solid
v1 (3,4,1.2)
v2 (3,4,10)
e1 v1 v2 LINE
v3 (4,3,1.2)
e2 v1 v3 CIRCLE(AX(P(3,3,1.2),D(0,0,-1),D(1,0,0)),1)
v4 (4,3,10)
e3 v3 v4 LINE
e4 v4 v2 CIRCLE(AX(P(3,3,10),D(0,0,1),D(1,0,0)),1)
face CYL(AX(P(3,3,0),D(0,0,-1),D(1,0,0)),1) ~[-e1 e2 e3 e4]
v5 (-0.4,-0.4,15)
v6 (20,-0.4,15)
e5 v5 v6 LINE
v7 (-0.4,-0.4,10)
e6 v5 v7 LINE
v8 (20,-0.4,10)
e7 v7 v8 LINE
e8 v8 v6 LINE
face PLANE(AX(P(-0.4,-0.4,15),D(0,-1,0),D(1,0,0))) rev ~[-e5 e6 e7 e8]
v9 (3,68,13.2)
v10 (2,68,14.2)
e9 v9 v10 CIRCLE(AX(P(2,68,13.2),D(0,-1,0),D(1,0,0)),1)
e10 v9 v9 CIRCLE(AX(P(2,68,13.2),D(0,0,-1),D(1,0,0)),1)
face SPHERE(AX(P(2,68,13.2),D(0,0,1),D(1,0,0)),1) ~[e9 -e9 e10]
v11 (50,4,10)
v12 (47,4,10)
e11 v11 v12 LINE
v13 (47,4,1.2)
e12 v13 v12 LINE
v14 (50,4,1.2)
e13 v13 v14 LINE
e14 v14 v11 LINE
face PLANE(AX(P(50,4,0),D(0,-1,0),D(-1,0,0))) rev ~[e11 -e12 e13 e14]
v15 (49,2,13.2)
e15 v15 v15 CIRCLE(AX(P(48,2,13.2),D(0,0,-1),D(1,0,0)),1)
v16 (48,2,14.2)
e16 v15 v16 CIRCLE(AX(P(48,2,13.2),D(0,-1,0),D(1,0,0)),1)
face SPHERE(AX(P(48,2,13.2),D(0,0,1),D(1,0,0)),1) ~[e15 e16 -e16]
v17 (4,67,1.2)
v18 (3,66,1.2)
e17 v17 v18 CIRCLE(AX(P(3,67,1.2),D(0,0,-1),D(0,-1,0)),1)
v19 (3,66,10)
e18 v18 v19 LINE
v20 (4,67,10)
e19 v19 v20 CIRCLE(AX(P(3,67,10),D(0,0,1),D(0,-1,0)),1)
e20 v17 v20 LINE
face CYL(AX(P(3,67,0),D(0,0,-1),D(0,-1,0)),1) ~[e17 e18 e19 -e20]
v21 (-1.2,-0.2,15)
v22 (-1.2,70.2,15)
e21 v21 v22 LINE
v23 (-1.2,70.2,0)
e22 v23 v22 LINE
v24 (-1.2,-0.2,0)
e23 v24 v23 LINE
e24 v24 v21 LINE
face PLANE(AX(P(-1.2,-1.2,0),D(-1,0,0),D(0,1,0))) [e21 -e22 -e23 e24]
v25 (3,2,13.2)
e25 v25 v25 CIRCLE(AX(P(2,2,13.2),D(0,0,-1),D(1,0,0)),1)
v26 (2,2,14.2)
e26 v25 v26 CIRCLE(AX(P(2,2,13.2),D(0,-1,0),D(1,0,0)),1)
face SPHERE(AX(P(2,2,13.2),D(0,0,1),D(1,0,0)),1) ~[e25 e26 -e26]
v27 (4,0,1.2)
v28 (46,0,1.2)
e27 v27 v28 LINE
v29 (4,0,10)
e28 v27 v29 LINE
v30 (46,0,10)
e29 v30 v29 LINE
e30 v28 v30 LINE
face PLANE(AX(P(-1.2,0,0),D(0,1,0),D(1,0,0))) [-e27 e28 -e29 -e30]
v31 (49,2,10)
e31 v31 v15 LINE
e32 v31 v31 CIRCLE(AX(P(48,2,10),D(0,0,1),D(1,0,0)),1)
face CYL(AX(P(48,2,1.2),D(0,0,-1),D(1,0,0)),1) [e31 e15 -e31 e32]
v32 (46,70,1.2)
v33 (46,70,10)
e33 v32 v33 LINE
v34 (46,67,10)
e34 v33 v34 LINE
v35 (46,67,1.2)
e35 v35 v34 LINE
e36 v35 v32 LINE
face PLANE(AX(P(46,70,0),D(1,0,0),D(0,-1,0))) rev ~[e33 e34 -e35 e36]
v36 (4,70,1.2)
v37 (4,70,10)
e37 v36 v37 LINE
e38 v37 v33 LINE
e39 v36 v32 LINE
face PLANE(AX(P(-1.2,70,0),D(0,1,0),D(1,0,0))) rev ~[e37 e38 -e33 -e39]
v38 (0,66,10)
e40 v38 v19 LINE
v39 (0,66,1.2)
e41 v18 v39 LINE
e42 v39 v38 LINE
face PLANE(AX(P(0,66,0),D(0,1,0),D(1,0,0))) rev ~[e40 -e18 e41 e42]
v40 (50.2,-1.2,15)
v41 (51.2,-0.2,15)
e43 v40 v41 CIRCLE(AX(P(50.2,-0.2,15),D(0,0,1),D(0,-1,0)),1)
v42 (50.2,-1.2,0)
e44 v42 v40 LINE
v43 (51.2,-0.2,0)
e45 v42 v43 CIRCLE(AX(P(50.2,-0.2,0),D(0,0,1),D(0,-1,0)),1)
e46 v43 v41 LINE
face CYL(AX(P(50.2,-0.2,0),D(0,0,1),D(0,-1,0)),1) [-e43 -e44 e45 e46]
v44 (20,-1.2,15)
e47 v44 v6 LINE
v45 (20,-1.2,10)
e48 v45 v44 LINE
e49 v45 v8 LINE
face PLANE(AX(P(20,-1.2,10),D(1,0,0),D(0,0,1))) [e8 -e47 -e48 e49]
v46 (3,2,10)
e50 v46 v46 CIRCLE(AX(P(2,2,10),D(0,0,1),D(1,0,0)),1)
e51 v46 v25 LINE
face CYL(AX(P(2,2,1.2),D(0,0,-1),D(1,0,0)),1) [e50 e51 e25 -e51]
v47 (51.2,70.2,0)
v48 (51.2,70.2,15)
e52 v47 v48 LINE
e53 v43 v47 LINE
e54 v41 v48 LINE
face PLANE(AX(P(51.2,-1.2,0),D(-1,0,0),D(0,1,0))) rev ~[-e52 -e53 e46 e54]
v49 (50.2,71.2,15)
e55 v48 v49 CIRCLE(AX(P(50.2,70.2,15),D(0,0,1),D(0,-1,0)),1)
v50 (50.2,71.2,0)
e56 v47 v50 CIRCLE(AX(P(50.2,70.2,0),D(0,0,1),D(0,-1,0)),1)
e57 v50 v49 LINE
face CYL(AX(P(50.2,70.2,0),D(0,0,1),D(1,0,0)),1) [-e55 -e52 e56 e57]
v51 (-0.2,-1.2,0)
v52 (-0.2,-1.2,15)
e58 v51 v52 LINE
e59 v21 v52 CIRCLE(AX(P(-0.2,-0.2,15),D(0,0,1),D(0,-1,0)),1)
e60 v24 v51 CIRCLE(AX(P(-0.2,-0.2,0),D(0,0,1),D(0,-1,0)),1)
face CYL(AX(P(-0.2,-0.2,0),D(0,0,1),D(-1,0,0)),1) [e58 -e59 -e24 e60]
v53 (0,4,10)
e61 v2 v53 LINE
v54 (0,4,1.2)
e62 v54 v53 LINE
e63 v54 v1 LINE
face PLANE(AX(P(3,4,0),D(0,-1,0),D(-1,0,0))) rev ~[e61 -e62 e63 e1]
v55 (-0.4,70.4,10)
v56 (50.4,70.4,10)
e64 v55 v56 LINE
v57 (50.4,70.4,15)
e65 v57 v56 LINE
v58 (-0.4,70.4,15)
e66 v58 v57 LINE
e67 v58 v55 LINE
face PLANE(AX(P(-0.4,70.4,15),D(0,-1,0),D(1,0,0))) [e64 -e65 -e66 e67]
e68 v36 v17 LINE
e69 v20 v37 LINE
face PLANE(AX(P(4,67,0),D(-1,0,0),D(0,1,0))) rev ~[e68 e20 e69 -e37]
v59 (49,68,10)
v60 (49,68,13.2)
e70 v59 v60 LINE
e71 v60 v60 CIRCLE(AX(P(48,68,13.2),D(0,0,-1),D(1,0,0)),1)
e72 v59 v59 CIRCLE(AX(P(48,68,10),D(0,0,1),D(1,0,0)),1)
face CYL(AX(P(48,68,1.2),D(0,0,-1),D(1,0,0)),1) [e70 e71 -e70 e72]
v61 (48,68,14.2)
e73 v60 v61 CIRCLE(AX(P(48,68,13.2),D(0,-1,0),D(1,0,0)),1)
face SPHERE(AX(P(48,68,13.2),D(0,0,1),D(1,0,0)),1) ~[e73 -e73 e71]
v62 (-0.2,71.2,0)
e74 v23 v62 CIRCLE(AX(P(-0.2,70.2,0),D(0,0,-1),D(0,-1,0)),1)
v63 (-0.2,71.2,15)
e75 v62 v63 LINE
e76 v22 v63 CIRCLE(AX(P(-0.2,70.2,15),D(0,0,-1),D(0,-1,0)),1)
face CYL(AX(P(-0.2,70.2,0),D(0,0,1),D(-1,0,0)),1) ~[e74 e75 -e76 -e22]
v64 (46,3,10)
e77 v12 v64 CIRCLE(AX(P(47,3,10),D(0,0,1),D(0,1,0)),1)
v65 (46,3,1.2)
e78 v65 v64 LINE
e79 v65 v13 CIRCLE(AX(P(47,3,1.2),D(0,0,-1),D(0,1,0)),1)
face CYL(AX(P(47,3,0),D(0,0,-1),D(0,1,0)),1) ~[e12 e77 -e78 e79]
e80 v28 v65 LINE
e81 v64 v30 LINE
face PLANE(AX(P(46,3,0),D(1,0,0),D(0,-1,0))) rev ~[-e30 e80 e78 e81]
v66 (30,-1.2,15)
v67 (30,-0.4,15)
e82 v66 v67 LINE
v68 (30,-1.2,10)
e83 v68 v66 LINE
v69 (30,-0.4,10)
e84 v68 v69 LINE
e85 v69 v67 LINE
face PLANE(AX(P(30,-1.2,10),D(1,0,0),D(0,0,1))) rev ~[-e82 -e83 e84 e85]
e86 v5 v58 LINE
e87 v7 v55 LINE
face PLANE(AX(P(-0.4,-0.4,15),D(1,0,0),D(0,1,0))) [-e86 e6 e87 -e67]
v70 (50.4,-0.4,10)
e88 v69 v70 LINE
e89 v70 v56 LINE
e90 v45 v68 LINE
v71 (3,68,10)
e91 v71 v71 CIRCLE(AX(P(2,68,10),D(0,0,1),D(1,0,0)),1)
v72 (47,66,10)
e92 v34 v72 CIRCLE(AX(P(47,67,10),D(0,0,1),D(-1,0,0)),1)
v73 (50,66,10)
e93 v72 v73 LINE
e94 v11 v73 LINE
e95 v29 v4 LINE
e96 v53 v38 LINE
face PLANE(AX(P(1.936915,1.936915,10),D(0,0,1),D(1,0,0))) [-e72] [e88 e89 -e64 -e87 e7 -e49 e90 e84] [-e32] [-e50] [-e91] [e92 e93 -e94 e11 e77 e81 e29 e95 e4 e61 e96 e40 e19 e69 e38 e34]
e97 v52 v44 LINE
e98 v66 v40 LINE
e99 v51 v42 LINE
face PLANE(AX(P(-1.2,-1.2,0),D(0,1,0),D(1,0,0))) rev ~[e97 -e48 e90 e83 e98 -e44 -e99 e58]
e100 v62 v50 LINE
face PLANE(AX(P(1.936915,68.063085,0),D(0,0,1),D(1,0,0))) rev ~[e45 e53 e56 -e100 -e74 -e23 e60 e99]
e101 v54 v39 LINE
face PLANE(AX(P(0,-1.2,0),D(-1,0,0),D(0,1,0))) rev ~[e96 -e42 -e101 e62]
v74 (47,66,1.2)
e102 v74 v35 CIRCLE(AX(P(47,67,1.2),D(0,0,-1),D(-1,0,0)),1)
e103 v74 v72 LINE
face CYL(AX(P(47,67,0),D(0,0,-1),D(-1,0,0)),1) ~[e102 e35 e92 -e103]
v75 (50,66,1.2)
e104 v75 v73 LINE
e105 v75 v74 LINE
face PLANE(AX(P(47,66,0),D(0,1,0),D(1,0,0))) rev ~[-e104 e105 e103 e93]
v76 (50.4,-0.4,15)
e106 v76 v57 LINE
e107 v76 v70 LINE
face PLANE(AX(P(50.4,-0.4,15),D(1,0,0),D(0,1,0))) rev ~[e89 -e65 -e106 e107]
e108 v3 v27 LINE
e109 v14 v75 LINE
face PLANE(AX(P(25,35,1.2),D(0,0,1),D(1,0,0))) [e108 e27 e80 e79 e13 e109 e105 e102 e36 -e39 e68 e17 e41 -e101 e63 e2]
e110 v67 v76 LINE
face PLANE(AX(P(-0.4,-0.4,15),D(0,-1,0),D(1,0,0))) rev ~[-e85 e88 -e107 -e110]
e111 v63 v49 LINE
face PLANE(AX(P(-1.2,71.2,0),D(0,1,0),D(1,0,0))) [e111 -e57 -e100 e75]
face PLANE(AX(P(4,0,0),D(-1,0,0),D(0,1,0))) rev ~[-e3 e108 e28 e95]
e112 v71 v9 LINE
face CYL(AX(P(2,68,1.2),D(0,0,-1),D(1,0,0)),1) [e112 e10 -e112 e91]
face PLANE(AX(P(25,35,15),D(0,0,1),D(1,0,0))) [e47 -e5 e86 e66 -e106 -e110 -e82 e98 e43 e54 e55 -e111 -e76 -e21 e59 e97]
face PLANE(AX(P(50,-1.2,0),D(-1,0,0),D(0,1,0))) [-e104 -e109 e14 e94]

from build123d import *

# Parameters (mm, degrees)
F1_W      = 52.4
F1_H      = 72.4
F2_DEPTH  = 15
F3_T      = -1.2
F0_R      = 1
F4_DEPTH  = 10
F5_DEPTH  = 13
F6_R      = 1
F8_W      = 50.8
F8_H      = 70.8
F8_W_2    = 50
F8_H_2    = 70
F9_DEPTH  = 5
F10_W     = 10
F10_H     = 10
F11_DEPTH = 25


# Not quite as in the source:
# - two fillets or chamfers of one size are made in one step


with BuildPart() as f2:
    # F1 (on Top) → F2 (new body)
    with BuildSketch(Plane.XY):
        with Locations((25, 35)):
            Rectangle(F1_W, F1_H)
    extrude(amount=F2_DEPTH)

    # F3
    f3_openings = [f2.faces().sort_by_distance(p)[0] for p in [
        (25, 35, 15),
    ]]
    offset(amount=F3_T, openings=f3_openings)

    # F0 (on Top) → F4 (join)
    with BuildSketch(Plane.XY):
        with BuildLine():
            Line((4, 70), (0, 70))
            Line((0, 70), (0, 66))
            Line((0, 66), (3, 66))
            ThreePointArc((3, 66), (3.7071067812, 66.2928932188), (4, 67))
            Line((4, 67), (4, 70))
        make_face()
        with Locations((2, 68)):
            Circle(F0_R, mode=Mode.SUBTRACT)
        with BuildLine():
            Line((47, 66), (50, 66))
            Line((50, 66), (50, 70))
            Line((50, 70), (46, 70))
            Line((46, 70), (46, 67))
            ThreePointArc((46, 67), (46.2928932188, 66.2928932188), (47, 66))
        make_face()
        with Locations((48, 68)):
            Circle(F0_R, mode=Mode.SUBTRACT)
        with BuildLine():
            Line((50, 0), (50, 4))
            Line((50, 4), (47, 4))
            ThreePointArc((47, 4), (46.2928932188, 3.7071067812), (46, 3))
            Line((46, 3), (46, 0))
            Line((46, 0), (50, 0))
        make_face()
        with Locations((48, 2)):
            Circle(F0_R, mode=Mode.SUBTRACT)
        with BuildLine():
            ThreePointArc((4, 3), (3.7071067812, 3.7071067812), (3, 4))
            Line((3, 4), (0, 4))
            Line((0, 4), (0, 0))
            Line((0, 0), (4, 0))
            Line((4, 0), (4, 3))
        make_face()
        with Locations((2, 2)):
            Circle(F0_R, mode=Mode.SUBTRACT)
    extrude(amount=F4_DEPTH)

    # F5 (add): faces of the model
    f5_faces = [f2.faces().sort_by_distance(p)[0] for p in [
        (2, 2, 1.2),
        (48, 2, 1.2),
        (2, 68, 1.2),
        (48, 68, 1.2),
    ]]
    extrude(f5_faces, amount=F5_DEPTH)

    # F6
    f6_edges = [f2.edges().sort_by_distance(p)[0] for p in [
        (1, 2, 14.2),
        (47, 2, 14.2),
        (1, 68, 14.2),
        (47, 68, 14.2),
        (-1.2, -1.2, 7.5),
        (51.2, -1.2, 7.5),
        (-1.2, 71.2, 7.5),
        (51.2, 71.2, 7.5),
    ]]
    fillet(f6_edges, radius=F6_R)

    # F8 (on face) → F9 (cut)
    with BuildSketch(Plane.XY.offset(15)):
        with Locations((25, 35)):
            Rectangle(F8_W, F8_H)
        with Locations((25, 35)):
            Rectangle(F8_W_2, F8_H_2, mode=Mode.SUBTRACT)
    extrude(amount=-F9_DEPTH, mode=Mode.SUBTRACT)

    # F10 (on face) → F11 (cut)
    with BuildSketch(Plane.XZ.offset(1.2)):
        with Locations((25, 15)):
            Rectangle(F10_W, F10_H)
    extrude(amount=-F11_DEPTH, mode=Mode.SUBTRACT)


solid = f2.part
